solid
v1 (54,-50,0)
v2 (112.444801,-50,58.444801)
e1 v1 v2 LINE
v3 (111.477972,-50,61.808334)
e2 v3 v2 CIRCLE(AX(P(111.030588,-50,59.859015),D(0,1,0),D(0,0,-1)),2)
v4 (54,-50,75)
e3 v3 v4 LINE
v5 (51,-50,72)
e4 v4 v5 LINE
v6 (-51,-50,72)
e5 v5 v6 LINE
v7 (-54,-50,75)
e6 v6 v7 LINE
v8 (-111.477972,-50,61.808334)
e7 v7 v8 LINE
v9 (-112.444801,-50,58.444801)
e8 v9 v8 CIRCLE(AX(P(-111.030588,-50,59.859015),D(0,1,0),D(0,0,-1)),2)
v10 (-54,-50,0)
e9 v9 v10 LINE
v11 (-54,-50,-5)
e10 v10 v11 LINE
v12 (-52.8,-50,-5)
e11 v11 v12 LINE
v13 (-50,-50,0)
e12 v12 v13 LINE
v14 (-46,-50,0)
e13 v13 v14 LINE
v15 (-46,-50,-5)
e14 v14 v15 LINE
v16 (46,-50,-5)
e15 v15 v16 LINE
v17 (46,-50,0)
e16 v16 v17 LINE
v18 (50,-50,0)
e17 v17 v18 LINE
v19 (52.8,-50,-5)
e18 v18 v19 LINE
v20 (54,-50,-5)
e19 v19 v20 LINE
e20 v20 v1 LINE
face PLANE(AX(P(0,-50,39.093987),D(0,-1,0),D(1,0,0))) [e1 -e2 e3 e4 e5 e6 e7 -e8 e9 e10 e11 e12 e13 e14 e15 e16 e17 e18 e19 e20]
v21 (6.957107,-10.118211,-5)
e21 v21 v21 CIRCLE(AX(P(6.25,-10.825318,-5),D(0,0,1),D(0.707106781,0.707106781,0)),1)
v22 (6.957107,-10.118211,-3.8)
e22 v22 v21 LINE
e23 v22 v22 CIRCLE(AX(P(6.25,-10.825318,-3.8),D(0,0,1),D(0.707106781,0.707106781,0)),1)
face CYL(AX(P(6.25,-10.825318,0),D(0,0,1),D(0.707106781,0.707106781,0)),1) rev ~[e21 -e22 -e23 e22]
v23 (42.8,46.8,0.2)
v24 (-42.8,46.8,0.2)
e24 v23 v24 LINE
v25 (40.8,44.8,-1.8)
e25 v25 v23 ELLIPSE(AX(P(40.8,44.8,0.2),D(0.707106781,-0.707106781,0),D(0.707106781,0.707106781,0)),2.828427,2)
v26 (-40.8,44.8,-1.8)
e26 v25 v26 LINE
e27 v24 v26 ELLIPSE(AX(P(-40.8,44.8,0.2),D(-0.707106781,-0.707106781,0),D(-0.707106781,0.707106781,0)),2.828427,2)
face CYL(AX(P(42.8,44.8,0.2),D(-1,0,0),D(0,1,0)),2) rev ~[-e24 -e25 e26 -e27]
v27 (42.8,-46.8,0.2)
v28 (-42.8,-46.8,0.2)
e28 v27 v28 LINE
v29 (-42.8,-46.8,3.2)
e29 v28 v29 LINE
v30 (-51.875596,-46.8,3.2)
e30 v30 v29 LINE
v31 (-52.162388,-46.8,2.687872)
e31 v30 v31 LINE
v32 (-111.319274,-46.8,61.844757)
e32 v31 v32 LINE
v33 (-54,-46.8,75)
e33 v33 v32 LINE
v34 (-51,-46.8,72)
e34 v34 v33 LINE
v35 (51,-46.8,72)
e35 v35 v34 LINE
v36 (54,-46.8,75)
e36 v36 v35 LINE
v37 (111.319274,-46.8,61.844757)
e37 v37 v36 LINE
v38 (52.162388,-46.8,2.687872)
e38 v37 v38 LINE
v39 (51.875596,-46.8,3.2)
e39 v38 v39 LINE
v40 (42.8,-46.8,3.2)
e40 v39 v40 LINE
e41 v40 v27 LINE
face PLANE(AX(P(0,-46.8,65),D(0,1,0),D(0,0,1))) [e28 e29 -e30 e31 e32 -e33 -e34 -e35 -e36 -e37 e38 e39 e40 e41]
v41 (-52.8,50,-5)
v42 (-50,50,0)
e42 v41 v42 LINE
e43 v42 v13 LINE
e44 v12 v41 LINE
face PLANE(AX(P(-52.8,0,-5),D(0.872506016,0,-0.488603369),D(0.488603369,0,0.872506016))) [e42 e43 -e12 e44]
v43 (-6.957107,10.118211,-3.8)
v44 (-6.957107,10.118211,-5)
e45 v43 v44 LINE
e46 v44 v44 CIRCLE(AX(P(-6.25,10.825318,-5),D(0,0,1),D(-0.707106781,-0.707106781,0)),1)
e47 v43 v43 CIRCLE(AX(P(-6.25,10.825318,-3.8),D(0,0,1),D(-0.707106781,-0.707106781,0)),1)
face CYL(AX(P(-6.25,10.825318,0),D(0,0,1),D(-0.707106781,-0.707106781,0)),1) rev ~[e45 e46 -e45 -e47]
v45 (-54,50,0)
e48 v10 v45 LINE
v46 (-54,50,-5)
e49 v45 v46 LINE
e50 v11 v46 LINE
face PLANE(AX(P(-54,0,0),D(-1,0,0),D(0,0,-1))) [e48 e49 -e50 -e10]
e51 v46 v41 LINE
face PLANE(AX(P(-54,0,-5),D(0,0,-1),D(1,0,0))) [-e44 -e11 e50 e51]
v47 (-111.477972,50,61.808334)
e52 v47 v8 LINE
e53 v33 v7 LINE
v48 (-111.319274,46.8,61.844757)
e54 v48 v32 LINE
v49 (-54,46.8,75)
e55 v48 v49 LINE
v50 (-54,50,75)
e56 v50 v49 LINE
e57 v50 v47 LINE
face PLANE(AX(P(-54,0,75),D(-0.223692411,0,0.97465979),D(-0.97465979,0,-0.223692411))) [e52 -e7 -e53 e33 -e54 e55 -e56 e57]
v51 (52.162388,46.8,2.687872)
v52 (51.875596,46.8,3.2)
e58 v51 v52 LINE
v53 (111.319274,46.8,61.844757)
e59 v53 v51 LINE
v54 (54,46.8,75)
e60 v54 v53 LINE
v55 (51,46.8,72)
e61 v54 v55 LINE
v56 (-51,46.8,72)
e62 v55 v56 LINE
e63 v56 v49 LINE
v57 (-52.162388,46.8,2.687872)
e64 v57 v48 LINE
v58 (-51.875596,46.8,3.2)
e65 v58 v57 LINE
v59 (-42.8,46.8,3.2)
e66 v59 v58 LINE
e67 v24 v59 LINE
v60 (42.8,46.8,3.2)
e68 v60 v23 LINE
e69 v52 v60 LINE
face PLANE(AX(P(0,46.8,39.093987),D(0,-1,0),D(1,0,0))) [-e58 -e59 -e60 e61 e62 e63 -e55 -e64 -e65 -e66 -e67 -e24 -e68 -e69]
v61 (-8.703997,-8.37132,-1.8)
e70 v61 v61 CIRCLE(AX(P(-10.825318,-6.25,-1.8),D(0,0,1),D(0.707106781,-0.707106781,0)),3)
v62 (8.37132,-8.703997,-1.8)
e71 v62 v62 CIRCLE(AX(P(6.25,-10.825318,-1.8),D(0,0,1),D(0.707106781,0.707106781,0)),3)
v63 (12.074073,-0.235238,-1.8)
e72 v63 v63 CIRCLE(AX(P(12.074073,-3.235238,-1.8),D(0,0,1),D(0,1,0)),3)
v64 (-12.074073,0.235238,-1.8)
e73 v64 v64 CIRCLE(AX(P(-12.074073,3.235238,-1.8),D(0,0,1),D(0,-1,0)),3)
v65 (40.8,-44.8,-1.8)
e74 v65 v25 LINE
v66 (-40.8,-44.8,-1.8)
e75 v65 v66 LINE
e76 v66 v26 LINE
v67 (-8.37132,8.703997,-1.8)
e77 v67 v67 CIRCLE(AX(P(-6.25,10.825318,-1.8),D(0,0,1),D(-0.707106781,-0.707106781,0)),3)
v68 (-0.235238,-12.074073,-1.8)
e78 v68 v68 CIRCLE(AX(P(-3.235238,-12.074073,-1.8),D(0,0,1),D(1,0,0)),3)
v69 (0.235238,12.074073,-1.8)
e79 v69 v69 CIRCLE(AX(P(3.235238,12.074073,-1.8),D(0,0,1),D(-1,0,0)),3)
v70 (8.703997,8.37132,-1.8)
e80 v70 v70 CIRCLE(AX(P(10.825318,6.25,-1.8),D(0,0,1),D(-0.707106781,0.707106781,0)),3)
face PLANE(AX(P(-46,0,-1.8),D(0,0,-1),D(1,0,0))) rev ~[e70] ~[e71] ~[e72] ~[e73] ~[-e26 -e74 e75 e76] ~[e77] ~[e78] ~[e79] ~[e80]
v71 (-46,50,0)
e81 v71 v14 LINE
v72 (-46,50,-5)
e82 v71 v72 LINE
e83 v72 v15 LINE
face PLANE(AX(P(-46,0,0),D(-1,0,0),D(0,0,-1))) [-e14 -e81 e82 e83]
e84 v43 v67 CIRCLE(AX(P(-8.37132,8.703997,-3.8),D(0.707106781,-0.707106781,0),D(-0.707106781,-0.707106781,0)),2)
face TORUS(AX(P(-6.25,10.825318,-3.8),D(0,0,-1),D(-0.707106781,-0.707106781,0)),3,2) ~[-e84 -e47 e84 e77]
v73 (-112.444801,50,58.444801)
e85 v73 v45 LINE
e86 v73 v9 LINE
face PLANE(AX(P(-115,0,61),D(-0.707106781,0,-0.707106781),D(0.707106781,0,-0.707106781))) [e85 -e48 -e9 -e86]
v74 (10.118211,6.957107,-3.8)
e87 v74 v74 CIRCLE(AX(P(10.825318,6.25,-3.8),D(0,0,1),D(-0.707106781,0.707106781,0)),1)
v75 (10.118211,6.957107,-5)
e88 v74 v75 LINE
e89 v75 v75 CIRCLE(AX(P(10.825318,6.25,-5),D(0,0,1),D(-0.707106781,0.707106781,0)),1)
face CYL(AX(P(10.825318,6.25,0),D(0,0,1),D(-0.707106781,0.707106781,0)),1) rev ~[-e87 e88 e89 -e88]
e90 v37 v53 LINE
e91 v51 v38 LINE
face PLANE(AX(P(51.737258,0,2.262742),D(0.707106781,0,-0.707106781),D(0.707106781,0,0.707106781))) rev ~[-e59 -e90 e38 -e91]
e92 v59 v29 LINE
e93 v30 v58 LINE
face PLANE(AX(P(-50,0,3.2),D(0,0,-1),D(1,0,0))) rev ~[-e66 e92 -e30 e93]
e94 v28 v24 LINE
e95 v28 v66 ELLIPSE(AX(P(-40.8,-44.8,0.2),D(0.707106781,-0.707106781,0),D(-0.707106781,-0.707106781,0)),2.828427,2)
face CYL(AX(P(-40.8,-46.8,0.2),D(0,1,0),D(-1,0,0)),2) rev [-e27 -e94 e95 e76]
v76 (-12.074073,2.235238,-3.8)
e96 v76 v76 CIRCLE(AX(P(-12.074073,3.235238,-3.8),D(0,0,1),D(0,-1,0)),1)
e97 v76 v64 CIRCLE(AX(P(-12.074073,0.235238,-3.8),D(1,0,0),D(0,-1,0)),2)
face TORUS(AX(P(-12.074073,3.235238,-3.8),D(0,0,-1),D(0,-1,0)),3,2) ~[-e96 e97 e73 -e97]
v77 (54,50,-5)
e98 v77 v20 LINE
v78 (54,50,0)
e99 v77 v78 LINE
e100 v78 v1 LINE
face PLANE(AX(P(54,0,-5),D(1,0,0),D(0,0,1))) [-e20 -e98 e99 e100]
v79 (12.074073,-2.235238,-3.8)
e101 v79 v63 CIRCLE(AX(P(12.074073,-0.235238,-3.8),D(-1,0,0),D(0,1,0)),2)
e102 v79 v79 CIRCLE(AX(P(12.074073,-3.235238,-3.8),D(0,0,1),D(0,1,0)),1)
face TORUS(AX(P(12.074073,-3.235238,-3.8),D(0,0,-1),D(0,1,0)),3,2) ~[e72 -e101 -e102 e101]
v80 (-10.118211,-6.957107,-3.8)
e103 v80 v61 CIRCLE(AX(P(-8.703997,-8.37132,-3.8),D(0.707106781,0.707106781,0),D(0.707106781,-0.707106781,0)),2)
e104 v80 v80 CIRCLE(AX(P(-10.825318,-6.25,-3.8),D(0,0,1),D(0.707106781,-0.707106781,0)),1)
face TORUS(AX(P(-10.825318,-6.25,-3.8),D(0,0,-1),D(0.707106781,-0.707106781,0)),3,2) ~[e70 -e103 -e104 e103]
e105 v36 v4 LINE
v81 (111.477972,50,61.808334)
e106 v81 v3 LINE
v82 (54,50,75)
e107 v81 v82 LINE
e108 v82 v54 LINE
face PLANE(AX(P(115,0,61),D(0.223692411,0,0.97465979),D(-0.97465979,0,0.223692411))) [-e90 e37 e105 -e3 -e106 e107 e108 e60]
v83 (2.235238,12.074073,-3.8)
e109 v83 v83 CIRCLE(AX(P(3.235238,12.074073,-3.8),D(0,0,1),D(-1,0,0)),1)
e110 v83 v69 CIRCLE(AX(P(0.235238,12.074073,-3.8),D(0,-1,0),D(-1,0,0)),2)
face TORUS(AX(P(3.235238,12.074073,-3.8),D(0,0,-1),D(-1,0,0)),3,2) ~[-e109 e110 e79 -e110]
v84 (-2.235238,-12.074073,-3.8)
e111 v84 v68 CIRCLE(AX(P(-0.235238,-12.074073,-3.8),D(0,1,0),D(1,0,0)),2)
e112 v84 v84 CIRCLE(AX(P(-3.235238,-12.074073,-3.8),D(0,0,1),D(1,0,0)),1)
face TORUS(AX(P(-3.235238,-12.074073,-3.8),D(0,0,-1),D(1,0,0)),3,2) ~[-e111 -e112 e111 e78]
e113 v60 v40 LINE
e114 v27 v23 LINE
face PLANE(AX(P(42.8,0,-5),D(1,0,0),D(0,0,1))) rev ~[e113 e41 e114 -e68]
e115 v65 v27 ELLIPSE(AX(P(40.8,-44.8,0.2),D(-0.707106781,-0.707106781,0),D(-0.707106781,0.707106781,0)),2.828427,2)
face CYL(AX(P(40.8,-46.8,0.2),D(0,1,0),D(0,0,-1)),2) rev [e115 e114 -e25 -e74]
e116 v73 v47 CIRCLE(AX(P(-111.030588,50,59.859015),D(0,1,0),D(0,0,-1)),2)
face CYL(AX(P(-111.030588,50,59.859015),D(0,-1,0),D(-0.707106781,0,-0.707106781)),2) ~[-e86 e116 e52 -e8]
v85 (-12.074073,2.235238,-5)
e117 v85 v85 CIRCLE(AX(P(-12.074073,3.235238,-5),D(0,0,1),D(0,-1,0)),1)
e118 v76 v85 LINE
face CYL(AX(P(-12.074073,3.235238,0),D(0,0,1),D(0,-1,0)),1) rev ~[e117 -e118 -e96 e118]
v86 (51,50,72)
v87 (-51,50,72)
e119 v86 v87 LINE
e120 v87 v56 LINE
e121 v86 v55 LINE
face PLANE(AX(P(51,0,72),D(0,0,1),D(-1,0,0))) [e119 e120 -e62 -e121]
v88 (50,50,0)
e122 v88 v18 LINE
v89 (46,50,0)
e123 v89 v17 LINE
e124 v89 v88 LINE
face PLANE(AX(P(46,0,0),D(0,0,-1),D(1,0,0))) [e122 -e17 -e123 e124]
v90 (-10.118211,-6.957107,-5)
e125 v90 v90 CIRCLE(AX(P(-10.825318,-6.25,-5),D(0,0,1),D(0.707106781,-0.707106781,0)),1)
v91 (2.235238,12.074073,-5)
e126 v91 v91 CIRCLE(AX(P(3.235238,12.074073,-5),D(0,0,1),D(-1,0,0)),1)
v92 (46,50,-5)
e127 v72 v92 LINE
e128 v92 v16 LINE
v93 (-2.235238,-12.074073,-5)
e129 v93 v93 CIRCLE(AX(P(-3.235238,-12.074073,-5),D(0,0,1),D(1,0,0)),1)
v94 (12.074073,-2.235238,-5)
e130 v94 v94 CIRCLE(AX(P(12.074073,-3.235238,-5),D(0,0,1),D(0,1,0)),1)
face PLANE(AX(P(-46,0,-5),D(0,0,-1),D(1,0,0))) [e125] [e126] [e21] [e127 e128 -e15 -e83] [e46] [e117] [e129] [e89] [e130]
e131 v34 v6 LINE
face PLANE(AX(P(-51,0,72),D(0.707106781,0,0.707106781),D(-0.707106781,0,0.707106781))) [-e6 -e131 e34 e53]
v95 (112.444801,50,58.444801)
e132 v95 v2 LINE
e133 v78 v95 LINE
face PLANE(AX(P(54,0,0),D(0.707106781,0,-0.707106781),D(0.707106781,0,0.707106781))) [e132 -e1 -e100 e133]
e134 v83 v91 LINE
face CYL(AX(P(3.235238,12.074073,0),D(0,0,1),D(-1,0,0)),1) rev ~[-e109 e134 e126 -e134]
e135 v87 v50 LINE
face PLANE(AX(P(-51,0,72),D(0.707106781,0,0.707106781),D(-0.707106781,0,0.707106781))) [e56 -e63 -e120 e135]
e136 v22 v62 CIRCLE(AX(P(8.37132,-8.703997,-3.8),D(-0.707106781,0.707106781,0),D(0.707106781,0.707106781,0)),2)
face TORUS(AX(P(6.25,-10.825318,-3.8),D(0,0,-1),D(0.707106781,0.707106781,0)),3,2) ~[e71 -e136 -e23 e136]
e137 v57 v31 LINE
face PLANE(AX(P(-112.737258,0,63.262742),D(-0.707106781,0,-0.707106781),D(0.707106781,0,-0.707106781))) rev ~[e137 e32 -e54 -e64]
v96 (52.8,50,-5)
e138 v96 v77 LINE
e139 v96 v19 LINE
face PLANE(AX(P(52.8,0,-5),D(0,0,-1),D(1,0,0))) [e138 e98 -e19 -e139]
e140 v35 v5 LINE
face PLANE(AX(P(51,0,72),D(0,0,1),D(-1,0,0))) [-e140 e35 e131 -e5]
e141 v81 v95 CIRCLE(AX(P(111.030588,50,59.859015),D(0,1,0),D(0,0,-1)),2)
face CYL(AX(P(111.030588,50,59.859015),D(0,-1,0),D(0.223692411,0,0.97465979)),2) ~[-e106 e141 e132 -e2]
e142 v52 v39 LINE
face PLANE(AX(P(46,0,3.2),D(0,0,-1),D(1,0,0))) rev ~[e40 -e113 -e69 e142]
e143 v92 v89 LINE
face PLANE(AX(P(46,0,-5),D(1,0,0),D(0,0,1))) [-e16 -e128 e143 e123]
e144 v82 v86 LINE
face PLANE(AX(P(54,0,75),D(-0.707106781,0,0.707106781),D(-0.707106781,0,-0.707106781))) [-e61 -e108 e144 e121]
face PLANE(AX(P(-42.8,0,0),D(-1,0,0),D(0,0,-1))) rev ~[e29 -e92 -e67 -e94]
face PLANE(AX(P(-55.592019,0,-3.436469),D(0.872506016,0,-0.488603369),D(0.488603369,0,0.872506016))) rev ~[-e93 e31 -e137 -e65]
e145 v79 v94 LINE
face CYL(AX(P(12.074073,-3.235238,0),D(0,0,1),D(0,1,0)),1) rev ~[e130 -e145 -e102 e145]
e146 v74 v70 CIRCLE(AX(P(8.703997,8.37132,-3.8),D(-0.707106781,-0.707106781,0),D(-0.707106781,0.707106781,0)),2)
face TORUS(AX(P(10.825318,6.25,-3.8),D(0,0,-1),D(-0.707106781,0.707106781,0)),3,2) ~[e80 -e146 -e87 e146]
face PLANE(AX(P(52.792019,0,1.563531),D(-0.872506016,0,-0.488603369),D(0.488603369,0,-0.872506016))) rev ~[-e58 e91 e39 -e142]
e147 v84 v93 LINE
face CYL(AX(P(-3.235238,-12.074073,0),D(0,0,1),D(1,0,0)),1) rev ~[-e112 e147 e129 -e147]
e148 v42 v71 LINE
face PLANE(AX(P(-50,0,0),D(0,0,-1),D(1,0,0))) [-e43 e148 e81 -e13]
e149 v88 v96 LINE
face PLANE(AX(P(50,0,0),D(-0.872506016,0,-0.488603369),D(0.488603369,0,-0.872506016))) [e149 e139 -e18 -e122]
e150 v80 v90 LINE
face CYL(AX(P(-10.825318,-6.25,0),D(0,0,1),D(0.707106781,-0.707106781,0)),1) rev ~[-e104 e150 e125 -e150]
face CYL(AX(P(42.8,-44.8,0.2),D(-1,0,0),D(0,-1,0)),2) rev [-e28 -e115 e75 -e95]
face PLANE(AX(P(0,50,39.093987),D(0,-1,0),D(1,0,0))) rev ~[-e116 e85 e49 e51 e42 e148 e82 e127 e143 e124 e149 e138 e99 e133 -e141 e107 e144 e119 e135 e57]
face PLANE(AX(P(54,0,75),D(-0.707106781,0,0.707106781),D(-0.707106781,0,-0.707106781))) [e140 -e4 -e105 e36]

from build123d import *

# Parameters (mm, degrees)
F1_DEPTH        = 50
F2_T            = -3.2
F3_R            = 1
F4_DEPTH        = 5.001
F4_COPIES_COUNT = 8
F5_W            = 93.6
F5_H            = 50
F6_DEPTH        = 150
F7_R            = 2
F8_R            = 2


# Not quite as in the source:
# - a pattern or mirror of a feature is missing from the dataset's text; its kind, count and spacing are read off the source's solid
# - a feature names something its author has since deleted; it is built from what else it names


with BuildPart() as f1:
    # F0 (on Front) → F1 (new body, symmetric)
    with BuildSketch(Plane.XZ):
        Polygon((-52.8, -5), (-50, 0), (-46, 0), (-46, -5), (46, -5), (46, 0), (50, 0), (52.8, -5), (54, -5), (54, 0), (115, 61), (54, 75), (51, 72), (-51, 72), (-54, 75), (-115, 61), (-54, 0), (-54, -5), align=None)
    extrude(amount=F1_DEPTH, both=True)

    # F2
    f2_openings = [f1.faces().sort_by_distance(p)[0] for p in [
        (-84.5, 0, 68),
        (84.5, 0, 68),
    ]]
    offset(amount=F2_T, openings=f2_openings, kind=Kind.INTERSECTION)

    # F3 (on Top) → F4 (cut, through all)
    with BuildSketch(Plane.XY):
        with Locations((-3.2352380638, -12.0740728286)):
            Circle(F3_R)
    f4 = extrude(amount=-F4_DEPTH, mode=Mode.SUBTRACT)

    # F4_copies: F4 ×8 about axis
    f4_copies_axis = Axis((0, 0, 0), (0, 0, 1))
    for i in range(1, F4_COPIES_COUNT):
        add(f4.rotate(f4_copies_axis, i * 360 / F4_COPIES_COUNT), mode=Mode.SUBTRACT)

    # F5 (on Right) → F6 (cut, symmetric)
    with BuildSketch(Plane.YZ):
        with Locations((0, 90)):
            Rectangle(F5_W, F5_H)
    extrude(amount=F6_DEPTH, both=True, mode=Mode.SUBTRACT)

    # F7
    f7_edges = [f1.edges().sort_by_distance(p)[0] for p in [
        (115, 0, 61),
        (-115, 0, 61),
    ]]
    fillet(f7_edges, radius=F7_R)

    # F8
    f8_edges = [f1.edges().sort_by_distance(p)[0] for p in [
        (42.8, 0, -1.8),
        (0, -46.8, -1.8),
        (0, 46.8, -1.8),
        (-42.8, 0, -1.8),
        (-5.542893, 11.532424, -1.8),
        (-12.074073, 4.235238, -1.8),
        (4.235238, 12.074073, -1.8),
        (11.532424, 5.542893, -1.8),
        (-11.532424, -5.542893, -1.8),
        (-4.235238, -12.074073, -1.8),
        (12.074073, -4.235238, -1.8),
        (5.542893, -11.532424, -1.8),
    ]]
    fillet(f8_edges, radius=F8_R)


solid = f1.part
